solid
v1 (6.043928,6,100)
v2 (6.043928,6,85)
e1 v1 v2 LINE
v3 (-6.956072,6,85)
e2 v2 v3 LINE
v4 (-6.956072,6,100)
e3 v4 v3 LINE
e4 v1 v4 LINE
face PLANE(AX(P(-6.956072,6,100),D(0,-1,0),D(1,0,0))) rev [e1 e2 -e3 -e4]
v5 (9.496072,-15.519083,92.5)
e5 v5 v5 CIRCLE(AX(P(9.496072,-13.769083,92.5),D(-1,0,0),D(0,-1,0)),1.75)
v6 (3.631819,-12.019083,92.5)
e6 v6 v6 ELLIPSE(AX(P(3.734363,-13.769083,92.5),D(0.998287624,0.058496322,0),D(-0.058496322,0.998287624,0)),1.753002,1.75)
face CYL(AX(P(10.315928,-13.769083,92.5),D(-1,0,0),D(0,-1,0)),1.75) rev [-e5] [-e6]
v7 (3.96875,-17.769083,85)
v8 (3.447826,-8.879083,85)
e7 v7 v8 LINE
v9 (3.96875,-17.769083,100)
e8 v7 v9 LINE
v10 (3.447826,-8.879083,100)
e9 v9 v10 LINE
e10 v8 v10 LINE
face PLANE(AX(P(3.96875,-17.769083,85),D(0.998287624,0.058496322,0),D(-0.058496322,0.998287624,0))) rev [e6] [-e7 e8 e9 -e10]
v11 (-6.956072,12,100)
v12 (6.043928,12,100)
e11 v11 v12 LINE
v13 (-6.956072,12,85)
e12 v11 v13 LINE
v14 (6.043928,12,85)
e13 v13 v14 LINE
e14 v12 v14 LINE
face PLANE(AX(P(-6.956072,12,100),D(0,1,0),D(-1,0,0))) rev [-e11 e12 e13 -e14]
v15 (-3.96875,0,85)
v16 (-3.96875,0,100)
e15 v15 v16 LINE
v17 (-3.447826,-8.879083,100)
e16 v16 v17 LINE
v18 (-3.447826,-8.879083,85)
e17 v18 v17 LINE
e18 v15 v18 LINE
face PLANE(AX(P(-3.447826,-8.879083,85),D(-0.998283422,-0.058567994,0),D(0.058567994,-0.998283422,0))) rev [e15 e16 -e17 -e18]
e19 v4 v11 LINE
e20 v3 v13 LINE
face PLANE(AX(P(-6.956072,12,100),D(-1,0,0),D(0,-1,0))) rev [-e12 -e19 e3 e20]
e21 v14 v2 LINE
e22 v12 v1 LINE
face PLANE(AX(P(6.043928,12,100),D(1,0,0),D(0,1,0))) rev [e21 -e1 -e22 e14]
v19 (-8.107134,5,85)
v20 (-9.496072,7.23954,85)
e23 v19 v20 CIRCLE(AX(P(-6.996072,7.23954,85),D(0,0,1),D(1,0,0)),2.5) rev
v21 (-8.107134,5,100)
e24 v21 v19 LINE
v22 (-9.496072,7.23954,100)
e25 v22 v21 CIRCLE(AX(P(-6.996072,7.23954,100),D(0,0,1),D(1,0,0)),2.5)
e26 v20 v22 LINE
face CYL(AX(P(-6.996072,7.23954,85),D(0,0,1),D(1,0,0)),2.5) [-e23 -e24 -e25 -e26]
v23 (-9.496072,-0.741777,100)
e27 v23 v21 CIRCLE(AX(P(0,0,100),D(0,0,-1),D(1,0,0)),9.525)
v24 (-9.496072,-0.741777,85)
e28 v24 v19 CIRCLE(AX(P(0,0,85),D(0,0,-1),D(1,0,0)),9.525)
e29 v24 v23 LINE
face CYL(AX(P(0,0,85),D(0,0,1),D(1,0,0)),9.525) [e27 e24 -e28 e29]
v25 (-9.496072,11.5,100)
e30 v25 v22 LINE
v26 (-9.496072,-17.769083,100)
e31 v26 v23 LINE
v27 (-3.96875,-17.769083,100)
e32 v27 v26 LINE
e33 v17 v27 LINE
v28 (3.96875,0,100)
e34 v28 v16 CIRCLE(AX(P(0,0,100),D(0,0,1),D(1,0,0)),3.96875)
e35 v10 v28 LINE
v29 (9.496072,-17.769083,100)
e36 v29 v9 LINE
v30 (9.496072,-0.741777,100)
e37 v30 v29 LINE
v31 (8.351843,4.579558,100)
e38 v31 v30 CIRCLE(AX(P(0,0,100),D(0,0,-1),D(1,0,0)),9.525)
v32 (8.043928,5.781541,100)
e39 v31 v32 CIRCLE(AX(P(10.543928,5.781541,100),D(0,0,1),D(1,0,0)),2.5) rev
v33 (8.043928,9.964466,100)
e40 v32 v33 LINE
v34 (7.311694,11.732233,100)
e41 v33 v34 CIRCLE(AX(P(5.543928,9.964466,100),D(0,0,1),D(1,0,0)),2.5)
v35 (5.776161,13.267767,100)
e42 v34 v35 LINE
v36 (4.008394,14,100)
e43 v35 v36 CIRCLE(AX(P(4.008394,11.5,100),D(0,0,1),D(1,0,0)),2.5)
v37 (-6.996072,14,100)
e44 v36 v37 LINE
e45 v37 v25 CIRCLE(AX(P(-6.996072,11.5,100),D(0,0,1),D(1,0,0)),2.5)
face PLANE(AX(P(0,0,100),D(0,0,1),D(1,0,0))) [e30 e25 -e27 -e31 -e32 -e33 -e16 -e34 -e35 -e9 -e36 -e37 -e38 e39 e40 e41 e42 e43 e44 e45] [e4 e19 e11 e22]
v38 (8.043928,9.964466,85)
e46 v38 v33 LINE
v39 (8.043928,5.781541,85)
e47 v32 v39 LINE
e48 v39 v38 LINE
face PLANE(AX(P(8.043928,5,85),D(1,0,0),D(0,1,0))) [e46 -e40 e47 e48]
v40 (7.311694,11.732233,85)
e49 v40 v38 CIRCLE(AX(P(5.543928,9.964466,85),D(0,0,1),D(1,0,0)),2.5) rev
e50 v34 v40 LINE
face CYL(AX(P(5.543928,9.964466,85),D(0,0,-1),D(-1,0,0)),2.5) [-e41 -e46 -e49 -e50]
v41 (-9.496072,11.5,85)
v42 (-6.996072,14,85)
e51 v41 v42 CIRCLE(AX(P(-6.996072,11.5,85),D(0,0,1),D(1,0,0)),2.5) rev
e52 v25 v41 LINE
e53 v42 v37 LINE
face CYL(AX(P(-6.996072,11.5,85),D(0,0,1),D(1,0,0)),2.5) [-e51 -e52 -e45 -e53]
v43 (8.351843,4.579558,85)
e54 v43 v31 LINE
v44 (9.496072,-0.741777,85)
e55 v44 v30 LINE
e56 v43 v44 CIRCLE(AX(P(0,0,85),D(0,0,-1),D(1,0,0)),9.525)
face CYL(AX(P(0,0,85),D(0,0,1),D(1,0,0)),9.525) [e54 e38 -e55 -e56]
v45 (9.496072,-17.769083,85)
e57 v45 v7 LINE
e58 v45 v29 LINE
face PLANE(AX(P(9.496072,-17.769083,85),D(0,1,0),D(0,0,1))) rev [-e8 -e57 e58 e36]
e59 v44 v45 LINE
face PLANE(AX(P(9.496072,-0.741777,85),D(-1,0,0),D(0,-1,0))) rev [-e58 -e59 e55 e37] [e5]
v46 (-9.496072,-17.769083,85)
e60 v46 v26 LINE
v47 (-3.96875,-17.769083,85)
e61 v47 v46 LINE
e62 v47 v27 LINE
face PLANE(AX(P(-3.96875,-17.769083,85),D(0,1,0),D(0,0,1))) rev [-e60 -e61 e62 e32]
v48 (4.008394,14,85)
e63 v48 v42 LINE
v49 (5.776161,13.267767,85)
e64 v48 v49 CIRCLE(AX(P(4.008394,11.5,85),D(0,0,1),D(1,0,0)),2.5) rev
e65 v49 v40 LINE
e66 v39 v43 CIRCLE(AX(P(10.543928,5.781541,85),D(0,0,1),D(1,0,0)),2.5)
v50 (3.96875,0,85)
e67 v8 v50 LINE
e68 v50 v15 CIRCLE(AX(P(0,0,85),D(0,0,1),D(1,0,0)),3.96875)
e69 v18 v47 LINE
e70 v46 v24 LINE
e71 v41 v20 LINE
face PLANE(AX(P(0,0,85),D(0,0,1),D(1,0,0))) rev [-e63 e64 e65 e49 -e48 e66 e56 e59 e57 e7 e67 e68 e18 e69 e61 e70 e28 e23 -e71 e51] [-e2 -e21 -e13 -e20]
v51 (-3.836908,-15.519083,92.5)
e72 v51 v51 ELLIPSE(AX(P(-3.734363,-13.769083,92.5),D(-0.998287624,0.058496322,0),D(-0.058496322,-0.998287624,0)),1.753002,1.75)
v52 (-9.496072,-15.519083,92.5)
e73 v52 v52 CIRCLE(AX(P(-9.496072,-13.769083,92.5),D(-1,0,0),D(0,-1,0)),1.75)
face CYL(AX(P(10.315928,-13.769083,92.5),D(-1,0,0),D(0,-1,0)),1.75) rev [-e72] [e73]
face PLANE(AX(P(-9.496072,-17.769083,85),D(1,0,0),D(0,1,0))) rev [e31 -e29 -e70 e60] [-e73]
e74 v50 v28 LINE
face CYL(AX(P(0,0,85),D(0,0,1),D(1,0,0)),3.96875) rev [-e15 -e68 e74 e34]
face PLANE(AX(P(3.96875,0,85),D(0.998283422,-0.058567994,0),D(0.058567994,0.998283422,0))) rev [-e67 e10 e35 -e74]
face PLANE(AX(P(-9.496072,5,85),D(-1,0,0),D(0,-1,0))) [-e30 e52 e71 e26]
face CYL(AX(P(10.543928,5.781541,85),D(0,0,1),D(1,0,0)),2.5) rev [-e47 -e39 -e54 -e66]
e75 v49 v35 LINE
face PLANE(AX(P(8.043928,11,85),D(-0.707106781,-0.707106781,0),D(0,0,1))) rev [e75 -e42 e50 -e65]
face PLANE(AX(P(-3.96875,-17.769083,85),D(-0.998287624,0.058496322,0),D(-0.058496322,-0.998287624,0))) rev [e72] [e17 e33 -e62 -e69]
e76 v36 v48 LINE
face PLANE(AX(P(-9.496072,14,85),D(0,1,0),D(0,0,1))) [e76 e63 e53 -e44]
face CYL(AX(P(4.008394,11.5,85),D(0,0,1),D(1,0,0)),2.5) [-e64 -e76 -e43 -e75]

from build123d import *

# Parameters (mm, degrees)
CLIP_DEPTH          = 15
SKETCH7_R           = 1.75
CUT_EXTRUDE4_DEPTH  = 19.812
SKETCH8_W           = 17.539999972
SKETCH8_H           = 9.000000002
BOSS_EXTRUDE1_DEPTH = 15
SKETCH10_W          = 13
SKETCH10_H          = 6
CUT_EXTRUDE5_DEPTH  = 15
CHAMFER2_SIZE       = 3
FILLET1_R           = 2.5


with BuildPart() as part:
    # Sketch1 → Clip (new body)
    with BuildSketch(Plane(origin=(0, -100, 100), x_dir=(1, 0, 0), z_dir=(0, 0, -1))):
        with BuildLine():
            Line((-3.447825682, -91.120916541), (-3.96875, -100))
            ThreePointArc((-3.96875, -100), (0, -103.96875), (3.96875, -100))
            Line((3.96875, -100), (3.447825682, -91.120916541))
            Line((3.447825682, -91.120916541), (3.96875, -82.230916541))
            Line((3.96875, -82.230916541), (9.496072463, -82.230916541))
            Line((9.496072463, -82.230916541), (9.496072463, -99.258223228))
            ThreePointArc((9.496072463, -99.258223228), (0, -109.525), (-9.496072463, -99.258223228))
            Line((-9.496072463, -99.258223228), (-9.496072463, -82.230916541))
            Line((-9.496072463, -82.230916541), (-3.96875, -82.230916541))
            Line((-3.96875, -82.230916541), (-3.447825682, -91.120916541))
        make_face()
    extrude(amount=CLIP_DEPTH)

    # Sketch7 → Cut-Extrude4 (cut)
    with BuildSketch(Plane.ZY.offset(9.496072463)):
        with Locations(Location((92.5, -13.769083459, 0), (0, 0, 270))):
            Circle(SKETCH7_R)
    extrude(amount=-CUT_EXTRUDE4_DEPTH, mode=Mode.SUBTRACT)

    # Sketch8 → Boss-Extrude1 (add)
    with BuildSketch(Plane.XY.offset(100)):
        with Locations((-0.726072477, 9.499999907)):
            Rectangle(SKETCH8_W, SKETCH8_H)
    extrude(amount=-BOSS_EXTRUDE1_DEPTH)

    # Sketch10 → Cut-Extrude5 (cut)
    with BuildSketch(Plane(origin=(0, 0, 85), x_dir=(-1, 0, 0), z_dir=(0, 0, -1))):
        with Locations((0.456072491, 8.999999876)):
            Rectangle(SKETCH10_W, SKETCH10_H)
    extrude(amount=-CUT_EXTRUDE5_DEPTH, mode=Mode.SUBTRACT)

    # Chamfer2
    chamfer2_edges = [part.edges().sort_by_distance(p)[0] for p in [
        (8.043927509, 13.999999908, 92.5),
    ]]
    chamfer(chamfer2_edges, length=CHAMFER2_SIZE)

    # Fillet1
    # the kernel refuses this fillet: 2.5 mm, written as the material it adds along each edge
    with BuildSketch(Plane(origin=(8.043927509, 5.101064127, 85), x_dir=(0, 1, 0), z_dir=(0, 0, 1))) as fillet1_piece_1:
        with BuildLine():
            CenterArc((0.68047699, -2.5), FILLET1_R, 90, 28.737235663)
            ThreePointArc((-0.521506611, -0.307915279), (-0.258305429, -0.158103532), (0, 0))
            Line((0, 0), (0.68047699, 0))
        make_face()
    extrude(amount=15)
    # the kernel refuses this fillet: 2.5 mm, written as the material it takes off along each edge
    with BuildSketch(Plane(origin=(-9.496072463, 13.999999908, 106.25), x_dir=(1, 0, 0), z_dir=(0, 0, -1))) as fillet1_2_piece_1:
        with BuildLine():
            CenterArc((FILLET1_R, FILLET1_R), FILLET1_R, 180, 90)
            Line((0, FILLET1_R), (0, 0))
            Line((0, 0), (FILLET1_R, 0))
        make_face()
    extrude(amount=27.5, mode=Mode.SUBTRACT)
    with BuildSketch(Plane(origin=(-9.496072463, 4.999999906, 105.598851266), x_dir=(0, 1, 0), z_dir=(0, 0, -1))) as fillet1_2_piece_2:
        with BuildLine():
            CenterArc((2.239540506, 2.5), FILLET1_R, 206.386538366, 63.613461634)
            Line((0, 1.388938201), (0, 0))
            Line((0, 0), (2.239540506, 0))
        make_face()
    extrude(amount=26.197702531, mode=Mode.SUBTRACT)
    with BuildSketch(Plane(origin=(5.043927509, 13.999999908, 102.588834765), x_dir=(-1, 0, 0), z_dir=(0, 0, -1)), Plane(origin=(8.043927509, 10.999999908, 102.588834765), x_dir=(-0.7071067811865475, 0.7071067811865475, 0), z_dir=(0, 0, -1))) as fillet1_2_piece_3:
        with BuildLine():
            CenterArc((FILLET1_R * 0.414213562373, -FILLET1_R), FILLET1_R, 90, 45)
            Line((-FILLET1_R * 0.292893218813, -FILLET1_R * 0.292893218813), (0, 0))
            Line((0, 0), (FILLET1_R * 0.414213562373, 0))
        make_face()
    extrude(amount=20.17766953, mode=Mode.SUBTRACT)


solid = part.part
